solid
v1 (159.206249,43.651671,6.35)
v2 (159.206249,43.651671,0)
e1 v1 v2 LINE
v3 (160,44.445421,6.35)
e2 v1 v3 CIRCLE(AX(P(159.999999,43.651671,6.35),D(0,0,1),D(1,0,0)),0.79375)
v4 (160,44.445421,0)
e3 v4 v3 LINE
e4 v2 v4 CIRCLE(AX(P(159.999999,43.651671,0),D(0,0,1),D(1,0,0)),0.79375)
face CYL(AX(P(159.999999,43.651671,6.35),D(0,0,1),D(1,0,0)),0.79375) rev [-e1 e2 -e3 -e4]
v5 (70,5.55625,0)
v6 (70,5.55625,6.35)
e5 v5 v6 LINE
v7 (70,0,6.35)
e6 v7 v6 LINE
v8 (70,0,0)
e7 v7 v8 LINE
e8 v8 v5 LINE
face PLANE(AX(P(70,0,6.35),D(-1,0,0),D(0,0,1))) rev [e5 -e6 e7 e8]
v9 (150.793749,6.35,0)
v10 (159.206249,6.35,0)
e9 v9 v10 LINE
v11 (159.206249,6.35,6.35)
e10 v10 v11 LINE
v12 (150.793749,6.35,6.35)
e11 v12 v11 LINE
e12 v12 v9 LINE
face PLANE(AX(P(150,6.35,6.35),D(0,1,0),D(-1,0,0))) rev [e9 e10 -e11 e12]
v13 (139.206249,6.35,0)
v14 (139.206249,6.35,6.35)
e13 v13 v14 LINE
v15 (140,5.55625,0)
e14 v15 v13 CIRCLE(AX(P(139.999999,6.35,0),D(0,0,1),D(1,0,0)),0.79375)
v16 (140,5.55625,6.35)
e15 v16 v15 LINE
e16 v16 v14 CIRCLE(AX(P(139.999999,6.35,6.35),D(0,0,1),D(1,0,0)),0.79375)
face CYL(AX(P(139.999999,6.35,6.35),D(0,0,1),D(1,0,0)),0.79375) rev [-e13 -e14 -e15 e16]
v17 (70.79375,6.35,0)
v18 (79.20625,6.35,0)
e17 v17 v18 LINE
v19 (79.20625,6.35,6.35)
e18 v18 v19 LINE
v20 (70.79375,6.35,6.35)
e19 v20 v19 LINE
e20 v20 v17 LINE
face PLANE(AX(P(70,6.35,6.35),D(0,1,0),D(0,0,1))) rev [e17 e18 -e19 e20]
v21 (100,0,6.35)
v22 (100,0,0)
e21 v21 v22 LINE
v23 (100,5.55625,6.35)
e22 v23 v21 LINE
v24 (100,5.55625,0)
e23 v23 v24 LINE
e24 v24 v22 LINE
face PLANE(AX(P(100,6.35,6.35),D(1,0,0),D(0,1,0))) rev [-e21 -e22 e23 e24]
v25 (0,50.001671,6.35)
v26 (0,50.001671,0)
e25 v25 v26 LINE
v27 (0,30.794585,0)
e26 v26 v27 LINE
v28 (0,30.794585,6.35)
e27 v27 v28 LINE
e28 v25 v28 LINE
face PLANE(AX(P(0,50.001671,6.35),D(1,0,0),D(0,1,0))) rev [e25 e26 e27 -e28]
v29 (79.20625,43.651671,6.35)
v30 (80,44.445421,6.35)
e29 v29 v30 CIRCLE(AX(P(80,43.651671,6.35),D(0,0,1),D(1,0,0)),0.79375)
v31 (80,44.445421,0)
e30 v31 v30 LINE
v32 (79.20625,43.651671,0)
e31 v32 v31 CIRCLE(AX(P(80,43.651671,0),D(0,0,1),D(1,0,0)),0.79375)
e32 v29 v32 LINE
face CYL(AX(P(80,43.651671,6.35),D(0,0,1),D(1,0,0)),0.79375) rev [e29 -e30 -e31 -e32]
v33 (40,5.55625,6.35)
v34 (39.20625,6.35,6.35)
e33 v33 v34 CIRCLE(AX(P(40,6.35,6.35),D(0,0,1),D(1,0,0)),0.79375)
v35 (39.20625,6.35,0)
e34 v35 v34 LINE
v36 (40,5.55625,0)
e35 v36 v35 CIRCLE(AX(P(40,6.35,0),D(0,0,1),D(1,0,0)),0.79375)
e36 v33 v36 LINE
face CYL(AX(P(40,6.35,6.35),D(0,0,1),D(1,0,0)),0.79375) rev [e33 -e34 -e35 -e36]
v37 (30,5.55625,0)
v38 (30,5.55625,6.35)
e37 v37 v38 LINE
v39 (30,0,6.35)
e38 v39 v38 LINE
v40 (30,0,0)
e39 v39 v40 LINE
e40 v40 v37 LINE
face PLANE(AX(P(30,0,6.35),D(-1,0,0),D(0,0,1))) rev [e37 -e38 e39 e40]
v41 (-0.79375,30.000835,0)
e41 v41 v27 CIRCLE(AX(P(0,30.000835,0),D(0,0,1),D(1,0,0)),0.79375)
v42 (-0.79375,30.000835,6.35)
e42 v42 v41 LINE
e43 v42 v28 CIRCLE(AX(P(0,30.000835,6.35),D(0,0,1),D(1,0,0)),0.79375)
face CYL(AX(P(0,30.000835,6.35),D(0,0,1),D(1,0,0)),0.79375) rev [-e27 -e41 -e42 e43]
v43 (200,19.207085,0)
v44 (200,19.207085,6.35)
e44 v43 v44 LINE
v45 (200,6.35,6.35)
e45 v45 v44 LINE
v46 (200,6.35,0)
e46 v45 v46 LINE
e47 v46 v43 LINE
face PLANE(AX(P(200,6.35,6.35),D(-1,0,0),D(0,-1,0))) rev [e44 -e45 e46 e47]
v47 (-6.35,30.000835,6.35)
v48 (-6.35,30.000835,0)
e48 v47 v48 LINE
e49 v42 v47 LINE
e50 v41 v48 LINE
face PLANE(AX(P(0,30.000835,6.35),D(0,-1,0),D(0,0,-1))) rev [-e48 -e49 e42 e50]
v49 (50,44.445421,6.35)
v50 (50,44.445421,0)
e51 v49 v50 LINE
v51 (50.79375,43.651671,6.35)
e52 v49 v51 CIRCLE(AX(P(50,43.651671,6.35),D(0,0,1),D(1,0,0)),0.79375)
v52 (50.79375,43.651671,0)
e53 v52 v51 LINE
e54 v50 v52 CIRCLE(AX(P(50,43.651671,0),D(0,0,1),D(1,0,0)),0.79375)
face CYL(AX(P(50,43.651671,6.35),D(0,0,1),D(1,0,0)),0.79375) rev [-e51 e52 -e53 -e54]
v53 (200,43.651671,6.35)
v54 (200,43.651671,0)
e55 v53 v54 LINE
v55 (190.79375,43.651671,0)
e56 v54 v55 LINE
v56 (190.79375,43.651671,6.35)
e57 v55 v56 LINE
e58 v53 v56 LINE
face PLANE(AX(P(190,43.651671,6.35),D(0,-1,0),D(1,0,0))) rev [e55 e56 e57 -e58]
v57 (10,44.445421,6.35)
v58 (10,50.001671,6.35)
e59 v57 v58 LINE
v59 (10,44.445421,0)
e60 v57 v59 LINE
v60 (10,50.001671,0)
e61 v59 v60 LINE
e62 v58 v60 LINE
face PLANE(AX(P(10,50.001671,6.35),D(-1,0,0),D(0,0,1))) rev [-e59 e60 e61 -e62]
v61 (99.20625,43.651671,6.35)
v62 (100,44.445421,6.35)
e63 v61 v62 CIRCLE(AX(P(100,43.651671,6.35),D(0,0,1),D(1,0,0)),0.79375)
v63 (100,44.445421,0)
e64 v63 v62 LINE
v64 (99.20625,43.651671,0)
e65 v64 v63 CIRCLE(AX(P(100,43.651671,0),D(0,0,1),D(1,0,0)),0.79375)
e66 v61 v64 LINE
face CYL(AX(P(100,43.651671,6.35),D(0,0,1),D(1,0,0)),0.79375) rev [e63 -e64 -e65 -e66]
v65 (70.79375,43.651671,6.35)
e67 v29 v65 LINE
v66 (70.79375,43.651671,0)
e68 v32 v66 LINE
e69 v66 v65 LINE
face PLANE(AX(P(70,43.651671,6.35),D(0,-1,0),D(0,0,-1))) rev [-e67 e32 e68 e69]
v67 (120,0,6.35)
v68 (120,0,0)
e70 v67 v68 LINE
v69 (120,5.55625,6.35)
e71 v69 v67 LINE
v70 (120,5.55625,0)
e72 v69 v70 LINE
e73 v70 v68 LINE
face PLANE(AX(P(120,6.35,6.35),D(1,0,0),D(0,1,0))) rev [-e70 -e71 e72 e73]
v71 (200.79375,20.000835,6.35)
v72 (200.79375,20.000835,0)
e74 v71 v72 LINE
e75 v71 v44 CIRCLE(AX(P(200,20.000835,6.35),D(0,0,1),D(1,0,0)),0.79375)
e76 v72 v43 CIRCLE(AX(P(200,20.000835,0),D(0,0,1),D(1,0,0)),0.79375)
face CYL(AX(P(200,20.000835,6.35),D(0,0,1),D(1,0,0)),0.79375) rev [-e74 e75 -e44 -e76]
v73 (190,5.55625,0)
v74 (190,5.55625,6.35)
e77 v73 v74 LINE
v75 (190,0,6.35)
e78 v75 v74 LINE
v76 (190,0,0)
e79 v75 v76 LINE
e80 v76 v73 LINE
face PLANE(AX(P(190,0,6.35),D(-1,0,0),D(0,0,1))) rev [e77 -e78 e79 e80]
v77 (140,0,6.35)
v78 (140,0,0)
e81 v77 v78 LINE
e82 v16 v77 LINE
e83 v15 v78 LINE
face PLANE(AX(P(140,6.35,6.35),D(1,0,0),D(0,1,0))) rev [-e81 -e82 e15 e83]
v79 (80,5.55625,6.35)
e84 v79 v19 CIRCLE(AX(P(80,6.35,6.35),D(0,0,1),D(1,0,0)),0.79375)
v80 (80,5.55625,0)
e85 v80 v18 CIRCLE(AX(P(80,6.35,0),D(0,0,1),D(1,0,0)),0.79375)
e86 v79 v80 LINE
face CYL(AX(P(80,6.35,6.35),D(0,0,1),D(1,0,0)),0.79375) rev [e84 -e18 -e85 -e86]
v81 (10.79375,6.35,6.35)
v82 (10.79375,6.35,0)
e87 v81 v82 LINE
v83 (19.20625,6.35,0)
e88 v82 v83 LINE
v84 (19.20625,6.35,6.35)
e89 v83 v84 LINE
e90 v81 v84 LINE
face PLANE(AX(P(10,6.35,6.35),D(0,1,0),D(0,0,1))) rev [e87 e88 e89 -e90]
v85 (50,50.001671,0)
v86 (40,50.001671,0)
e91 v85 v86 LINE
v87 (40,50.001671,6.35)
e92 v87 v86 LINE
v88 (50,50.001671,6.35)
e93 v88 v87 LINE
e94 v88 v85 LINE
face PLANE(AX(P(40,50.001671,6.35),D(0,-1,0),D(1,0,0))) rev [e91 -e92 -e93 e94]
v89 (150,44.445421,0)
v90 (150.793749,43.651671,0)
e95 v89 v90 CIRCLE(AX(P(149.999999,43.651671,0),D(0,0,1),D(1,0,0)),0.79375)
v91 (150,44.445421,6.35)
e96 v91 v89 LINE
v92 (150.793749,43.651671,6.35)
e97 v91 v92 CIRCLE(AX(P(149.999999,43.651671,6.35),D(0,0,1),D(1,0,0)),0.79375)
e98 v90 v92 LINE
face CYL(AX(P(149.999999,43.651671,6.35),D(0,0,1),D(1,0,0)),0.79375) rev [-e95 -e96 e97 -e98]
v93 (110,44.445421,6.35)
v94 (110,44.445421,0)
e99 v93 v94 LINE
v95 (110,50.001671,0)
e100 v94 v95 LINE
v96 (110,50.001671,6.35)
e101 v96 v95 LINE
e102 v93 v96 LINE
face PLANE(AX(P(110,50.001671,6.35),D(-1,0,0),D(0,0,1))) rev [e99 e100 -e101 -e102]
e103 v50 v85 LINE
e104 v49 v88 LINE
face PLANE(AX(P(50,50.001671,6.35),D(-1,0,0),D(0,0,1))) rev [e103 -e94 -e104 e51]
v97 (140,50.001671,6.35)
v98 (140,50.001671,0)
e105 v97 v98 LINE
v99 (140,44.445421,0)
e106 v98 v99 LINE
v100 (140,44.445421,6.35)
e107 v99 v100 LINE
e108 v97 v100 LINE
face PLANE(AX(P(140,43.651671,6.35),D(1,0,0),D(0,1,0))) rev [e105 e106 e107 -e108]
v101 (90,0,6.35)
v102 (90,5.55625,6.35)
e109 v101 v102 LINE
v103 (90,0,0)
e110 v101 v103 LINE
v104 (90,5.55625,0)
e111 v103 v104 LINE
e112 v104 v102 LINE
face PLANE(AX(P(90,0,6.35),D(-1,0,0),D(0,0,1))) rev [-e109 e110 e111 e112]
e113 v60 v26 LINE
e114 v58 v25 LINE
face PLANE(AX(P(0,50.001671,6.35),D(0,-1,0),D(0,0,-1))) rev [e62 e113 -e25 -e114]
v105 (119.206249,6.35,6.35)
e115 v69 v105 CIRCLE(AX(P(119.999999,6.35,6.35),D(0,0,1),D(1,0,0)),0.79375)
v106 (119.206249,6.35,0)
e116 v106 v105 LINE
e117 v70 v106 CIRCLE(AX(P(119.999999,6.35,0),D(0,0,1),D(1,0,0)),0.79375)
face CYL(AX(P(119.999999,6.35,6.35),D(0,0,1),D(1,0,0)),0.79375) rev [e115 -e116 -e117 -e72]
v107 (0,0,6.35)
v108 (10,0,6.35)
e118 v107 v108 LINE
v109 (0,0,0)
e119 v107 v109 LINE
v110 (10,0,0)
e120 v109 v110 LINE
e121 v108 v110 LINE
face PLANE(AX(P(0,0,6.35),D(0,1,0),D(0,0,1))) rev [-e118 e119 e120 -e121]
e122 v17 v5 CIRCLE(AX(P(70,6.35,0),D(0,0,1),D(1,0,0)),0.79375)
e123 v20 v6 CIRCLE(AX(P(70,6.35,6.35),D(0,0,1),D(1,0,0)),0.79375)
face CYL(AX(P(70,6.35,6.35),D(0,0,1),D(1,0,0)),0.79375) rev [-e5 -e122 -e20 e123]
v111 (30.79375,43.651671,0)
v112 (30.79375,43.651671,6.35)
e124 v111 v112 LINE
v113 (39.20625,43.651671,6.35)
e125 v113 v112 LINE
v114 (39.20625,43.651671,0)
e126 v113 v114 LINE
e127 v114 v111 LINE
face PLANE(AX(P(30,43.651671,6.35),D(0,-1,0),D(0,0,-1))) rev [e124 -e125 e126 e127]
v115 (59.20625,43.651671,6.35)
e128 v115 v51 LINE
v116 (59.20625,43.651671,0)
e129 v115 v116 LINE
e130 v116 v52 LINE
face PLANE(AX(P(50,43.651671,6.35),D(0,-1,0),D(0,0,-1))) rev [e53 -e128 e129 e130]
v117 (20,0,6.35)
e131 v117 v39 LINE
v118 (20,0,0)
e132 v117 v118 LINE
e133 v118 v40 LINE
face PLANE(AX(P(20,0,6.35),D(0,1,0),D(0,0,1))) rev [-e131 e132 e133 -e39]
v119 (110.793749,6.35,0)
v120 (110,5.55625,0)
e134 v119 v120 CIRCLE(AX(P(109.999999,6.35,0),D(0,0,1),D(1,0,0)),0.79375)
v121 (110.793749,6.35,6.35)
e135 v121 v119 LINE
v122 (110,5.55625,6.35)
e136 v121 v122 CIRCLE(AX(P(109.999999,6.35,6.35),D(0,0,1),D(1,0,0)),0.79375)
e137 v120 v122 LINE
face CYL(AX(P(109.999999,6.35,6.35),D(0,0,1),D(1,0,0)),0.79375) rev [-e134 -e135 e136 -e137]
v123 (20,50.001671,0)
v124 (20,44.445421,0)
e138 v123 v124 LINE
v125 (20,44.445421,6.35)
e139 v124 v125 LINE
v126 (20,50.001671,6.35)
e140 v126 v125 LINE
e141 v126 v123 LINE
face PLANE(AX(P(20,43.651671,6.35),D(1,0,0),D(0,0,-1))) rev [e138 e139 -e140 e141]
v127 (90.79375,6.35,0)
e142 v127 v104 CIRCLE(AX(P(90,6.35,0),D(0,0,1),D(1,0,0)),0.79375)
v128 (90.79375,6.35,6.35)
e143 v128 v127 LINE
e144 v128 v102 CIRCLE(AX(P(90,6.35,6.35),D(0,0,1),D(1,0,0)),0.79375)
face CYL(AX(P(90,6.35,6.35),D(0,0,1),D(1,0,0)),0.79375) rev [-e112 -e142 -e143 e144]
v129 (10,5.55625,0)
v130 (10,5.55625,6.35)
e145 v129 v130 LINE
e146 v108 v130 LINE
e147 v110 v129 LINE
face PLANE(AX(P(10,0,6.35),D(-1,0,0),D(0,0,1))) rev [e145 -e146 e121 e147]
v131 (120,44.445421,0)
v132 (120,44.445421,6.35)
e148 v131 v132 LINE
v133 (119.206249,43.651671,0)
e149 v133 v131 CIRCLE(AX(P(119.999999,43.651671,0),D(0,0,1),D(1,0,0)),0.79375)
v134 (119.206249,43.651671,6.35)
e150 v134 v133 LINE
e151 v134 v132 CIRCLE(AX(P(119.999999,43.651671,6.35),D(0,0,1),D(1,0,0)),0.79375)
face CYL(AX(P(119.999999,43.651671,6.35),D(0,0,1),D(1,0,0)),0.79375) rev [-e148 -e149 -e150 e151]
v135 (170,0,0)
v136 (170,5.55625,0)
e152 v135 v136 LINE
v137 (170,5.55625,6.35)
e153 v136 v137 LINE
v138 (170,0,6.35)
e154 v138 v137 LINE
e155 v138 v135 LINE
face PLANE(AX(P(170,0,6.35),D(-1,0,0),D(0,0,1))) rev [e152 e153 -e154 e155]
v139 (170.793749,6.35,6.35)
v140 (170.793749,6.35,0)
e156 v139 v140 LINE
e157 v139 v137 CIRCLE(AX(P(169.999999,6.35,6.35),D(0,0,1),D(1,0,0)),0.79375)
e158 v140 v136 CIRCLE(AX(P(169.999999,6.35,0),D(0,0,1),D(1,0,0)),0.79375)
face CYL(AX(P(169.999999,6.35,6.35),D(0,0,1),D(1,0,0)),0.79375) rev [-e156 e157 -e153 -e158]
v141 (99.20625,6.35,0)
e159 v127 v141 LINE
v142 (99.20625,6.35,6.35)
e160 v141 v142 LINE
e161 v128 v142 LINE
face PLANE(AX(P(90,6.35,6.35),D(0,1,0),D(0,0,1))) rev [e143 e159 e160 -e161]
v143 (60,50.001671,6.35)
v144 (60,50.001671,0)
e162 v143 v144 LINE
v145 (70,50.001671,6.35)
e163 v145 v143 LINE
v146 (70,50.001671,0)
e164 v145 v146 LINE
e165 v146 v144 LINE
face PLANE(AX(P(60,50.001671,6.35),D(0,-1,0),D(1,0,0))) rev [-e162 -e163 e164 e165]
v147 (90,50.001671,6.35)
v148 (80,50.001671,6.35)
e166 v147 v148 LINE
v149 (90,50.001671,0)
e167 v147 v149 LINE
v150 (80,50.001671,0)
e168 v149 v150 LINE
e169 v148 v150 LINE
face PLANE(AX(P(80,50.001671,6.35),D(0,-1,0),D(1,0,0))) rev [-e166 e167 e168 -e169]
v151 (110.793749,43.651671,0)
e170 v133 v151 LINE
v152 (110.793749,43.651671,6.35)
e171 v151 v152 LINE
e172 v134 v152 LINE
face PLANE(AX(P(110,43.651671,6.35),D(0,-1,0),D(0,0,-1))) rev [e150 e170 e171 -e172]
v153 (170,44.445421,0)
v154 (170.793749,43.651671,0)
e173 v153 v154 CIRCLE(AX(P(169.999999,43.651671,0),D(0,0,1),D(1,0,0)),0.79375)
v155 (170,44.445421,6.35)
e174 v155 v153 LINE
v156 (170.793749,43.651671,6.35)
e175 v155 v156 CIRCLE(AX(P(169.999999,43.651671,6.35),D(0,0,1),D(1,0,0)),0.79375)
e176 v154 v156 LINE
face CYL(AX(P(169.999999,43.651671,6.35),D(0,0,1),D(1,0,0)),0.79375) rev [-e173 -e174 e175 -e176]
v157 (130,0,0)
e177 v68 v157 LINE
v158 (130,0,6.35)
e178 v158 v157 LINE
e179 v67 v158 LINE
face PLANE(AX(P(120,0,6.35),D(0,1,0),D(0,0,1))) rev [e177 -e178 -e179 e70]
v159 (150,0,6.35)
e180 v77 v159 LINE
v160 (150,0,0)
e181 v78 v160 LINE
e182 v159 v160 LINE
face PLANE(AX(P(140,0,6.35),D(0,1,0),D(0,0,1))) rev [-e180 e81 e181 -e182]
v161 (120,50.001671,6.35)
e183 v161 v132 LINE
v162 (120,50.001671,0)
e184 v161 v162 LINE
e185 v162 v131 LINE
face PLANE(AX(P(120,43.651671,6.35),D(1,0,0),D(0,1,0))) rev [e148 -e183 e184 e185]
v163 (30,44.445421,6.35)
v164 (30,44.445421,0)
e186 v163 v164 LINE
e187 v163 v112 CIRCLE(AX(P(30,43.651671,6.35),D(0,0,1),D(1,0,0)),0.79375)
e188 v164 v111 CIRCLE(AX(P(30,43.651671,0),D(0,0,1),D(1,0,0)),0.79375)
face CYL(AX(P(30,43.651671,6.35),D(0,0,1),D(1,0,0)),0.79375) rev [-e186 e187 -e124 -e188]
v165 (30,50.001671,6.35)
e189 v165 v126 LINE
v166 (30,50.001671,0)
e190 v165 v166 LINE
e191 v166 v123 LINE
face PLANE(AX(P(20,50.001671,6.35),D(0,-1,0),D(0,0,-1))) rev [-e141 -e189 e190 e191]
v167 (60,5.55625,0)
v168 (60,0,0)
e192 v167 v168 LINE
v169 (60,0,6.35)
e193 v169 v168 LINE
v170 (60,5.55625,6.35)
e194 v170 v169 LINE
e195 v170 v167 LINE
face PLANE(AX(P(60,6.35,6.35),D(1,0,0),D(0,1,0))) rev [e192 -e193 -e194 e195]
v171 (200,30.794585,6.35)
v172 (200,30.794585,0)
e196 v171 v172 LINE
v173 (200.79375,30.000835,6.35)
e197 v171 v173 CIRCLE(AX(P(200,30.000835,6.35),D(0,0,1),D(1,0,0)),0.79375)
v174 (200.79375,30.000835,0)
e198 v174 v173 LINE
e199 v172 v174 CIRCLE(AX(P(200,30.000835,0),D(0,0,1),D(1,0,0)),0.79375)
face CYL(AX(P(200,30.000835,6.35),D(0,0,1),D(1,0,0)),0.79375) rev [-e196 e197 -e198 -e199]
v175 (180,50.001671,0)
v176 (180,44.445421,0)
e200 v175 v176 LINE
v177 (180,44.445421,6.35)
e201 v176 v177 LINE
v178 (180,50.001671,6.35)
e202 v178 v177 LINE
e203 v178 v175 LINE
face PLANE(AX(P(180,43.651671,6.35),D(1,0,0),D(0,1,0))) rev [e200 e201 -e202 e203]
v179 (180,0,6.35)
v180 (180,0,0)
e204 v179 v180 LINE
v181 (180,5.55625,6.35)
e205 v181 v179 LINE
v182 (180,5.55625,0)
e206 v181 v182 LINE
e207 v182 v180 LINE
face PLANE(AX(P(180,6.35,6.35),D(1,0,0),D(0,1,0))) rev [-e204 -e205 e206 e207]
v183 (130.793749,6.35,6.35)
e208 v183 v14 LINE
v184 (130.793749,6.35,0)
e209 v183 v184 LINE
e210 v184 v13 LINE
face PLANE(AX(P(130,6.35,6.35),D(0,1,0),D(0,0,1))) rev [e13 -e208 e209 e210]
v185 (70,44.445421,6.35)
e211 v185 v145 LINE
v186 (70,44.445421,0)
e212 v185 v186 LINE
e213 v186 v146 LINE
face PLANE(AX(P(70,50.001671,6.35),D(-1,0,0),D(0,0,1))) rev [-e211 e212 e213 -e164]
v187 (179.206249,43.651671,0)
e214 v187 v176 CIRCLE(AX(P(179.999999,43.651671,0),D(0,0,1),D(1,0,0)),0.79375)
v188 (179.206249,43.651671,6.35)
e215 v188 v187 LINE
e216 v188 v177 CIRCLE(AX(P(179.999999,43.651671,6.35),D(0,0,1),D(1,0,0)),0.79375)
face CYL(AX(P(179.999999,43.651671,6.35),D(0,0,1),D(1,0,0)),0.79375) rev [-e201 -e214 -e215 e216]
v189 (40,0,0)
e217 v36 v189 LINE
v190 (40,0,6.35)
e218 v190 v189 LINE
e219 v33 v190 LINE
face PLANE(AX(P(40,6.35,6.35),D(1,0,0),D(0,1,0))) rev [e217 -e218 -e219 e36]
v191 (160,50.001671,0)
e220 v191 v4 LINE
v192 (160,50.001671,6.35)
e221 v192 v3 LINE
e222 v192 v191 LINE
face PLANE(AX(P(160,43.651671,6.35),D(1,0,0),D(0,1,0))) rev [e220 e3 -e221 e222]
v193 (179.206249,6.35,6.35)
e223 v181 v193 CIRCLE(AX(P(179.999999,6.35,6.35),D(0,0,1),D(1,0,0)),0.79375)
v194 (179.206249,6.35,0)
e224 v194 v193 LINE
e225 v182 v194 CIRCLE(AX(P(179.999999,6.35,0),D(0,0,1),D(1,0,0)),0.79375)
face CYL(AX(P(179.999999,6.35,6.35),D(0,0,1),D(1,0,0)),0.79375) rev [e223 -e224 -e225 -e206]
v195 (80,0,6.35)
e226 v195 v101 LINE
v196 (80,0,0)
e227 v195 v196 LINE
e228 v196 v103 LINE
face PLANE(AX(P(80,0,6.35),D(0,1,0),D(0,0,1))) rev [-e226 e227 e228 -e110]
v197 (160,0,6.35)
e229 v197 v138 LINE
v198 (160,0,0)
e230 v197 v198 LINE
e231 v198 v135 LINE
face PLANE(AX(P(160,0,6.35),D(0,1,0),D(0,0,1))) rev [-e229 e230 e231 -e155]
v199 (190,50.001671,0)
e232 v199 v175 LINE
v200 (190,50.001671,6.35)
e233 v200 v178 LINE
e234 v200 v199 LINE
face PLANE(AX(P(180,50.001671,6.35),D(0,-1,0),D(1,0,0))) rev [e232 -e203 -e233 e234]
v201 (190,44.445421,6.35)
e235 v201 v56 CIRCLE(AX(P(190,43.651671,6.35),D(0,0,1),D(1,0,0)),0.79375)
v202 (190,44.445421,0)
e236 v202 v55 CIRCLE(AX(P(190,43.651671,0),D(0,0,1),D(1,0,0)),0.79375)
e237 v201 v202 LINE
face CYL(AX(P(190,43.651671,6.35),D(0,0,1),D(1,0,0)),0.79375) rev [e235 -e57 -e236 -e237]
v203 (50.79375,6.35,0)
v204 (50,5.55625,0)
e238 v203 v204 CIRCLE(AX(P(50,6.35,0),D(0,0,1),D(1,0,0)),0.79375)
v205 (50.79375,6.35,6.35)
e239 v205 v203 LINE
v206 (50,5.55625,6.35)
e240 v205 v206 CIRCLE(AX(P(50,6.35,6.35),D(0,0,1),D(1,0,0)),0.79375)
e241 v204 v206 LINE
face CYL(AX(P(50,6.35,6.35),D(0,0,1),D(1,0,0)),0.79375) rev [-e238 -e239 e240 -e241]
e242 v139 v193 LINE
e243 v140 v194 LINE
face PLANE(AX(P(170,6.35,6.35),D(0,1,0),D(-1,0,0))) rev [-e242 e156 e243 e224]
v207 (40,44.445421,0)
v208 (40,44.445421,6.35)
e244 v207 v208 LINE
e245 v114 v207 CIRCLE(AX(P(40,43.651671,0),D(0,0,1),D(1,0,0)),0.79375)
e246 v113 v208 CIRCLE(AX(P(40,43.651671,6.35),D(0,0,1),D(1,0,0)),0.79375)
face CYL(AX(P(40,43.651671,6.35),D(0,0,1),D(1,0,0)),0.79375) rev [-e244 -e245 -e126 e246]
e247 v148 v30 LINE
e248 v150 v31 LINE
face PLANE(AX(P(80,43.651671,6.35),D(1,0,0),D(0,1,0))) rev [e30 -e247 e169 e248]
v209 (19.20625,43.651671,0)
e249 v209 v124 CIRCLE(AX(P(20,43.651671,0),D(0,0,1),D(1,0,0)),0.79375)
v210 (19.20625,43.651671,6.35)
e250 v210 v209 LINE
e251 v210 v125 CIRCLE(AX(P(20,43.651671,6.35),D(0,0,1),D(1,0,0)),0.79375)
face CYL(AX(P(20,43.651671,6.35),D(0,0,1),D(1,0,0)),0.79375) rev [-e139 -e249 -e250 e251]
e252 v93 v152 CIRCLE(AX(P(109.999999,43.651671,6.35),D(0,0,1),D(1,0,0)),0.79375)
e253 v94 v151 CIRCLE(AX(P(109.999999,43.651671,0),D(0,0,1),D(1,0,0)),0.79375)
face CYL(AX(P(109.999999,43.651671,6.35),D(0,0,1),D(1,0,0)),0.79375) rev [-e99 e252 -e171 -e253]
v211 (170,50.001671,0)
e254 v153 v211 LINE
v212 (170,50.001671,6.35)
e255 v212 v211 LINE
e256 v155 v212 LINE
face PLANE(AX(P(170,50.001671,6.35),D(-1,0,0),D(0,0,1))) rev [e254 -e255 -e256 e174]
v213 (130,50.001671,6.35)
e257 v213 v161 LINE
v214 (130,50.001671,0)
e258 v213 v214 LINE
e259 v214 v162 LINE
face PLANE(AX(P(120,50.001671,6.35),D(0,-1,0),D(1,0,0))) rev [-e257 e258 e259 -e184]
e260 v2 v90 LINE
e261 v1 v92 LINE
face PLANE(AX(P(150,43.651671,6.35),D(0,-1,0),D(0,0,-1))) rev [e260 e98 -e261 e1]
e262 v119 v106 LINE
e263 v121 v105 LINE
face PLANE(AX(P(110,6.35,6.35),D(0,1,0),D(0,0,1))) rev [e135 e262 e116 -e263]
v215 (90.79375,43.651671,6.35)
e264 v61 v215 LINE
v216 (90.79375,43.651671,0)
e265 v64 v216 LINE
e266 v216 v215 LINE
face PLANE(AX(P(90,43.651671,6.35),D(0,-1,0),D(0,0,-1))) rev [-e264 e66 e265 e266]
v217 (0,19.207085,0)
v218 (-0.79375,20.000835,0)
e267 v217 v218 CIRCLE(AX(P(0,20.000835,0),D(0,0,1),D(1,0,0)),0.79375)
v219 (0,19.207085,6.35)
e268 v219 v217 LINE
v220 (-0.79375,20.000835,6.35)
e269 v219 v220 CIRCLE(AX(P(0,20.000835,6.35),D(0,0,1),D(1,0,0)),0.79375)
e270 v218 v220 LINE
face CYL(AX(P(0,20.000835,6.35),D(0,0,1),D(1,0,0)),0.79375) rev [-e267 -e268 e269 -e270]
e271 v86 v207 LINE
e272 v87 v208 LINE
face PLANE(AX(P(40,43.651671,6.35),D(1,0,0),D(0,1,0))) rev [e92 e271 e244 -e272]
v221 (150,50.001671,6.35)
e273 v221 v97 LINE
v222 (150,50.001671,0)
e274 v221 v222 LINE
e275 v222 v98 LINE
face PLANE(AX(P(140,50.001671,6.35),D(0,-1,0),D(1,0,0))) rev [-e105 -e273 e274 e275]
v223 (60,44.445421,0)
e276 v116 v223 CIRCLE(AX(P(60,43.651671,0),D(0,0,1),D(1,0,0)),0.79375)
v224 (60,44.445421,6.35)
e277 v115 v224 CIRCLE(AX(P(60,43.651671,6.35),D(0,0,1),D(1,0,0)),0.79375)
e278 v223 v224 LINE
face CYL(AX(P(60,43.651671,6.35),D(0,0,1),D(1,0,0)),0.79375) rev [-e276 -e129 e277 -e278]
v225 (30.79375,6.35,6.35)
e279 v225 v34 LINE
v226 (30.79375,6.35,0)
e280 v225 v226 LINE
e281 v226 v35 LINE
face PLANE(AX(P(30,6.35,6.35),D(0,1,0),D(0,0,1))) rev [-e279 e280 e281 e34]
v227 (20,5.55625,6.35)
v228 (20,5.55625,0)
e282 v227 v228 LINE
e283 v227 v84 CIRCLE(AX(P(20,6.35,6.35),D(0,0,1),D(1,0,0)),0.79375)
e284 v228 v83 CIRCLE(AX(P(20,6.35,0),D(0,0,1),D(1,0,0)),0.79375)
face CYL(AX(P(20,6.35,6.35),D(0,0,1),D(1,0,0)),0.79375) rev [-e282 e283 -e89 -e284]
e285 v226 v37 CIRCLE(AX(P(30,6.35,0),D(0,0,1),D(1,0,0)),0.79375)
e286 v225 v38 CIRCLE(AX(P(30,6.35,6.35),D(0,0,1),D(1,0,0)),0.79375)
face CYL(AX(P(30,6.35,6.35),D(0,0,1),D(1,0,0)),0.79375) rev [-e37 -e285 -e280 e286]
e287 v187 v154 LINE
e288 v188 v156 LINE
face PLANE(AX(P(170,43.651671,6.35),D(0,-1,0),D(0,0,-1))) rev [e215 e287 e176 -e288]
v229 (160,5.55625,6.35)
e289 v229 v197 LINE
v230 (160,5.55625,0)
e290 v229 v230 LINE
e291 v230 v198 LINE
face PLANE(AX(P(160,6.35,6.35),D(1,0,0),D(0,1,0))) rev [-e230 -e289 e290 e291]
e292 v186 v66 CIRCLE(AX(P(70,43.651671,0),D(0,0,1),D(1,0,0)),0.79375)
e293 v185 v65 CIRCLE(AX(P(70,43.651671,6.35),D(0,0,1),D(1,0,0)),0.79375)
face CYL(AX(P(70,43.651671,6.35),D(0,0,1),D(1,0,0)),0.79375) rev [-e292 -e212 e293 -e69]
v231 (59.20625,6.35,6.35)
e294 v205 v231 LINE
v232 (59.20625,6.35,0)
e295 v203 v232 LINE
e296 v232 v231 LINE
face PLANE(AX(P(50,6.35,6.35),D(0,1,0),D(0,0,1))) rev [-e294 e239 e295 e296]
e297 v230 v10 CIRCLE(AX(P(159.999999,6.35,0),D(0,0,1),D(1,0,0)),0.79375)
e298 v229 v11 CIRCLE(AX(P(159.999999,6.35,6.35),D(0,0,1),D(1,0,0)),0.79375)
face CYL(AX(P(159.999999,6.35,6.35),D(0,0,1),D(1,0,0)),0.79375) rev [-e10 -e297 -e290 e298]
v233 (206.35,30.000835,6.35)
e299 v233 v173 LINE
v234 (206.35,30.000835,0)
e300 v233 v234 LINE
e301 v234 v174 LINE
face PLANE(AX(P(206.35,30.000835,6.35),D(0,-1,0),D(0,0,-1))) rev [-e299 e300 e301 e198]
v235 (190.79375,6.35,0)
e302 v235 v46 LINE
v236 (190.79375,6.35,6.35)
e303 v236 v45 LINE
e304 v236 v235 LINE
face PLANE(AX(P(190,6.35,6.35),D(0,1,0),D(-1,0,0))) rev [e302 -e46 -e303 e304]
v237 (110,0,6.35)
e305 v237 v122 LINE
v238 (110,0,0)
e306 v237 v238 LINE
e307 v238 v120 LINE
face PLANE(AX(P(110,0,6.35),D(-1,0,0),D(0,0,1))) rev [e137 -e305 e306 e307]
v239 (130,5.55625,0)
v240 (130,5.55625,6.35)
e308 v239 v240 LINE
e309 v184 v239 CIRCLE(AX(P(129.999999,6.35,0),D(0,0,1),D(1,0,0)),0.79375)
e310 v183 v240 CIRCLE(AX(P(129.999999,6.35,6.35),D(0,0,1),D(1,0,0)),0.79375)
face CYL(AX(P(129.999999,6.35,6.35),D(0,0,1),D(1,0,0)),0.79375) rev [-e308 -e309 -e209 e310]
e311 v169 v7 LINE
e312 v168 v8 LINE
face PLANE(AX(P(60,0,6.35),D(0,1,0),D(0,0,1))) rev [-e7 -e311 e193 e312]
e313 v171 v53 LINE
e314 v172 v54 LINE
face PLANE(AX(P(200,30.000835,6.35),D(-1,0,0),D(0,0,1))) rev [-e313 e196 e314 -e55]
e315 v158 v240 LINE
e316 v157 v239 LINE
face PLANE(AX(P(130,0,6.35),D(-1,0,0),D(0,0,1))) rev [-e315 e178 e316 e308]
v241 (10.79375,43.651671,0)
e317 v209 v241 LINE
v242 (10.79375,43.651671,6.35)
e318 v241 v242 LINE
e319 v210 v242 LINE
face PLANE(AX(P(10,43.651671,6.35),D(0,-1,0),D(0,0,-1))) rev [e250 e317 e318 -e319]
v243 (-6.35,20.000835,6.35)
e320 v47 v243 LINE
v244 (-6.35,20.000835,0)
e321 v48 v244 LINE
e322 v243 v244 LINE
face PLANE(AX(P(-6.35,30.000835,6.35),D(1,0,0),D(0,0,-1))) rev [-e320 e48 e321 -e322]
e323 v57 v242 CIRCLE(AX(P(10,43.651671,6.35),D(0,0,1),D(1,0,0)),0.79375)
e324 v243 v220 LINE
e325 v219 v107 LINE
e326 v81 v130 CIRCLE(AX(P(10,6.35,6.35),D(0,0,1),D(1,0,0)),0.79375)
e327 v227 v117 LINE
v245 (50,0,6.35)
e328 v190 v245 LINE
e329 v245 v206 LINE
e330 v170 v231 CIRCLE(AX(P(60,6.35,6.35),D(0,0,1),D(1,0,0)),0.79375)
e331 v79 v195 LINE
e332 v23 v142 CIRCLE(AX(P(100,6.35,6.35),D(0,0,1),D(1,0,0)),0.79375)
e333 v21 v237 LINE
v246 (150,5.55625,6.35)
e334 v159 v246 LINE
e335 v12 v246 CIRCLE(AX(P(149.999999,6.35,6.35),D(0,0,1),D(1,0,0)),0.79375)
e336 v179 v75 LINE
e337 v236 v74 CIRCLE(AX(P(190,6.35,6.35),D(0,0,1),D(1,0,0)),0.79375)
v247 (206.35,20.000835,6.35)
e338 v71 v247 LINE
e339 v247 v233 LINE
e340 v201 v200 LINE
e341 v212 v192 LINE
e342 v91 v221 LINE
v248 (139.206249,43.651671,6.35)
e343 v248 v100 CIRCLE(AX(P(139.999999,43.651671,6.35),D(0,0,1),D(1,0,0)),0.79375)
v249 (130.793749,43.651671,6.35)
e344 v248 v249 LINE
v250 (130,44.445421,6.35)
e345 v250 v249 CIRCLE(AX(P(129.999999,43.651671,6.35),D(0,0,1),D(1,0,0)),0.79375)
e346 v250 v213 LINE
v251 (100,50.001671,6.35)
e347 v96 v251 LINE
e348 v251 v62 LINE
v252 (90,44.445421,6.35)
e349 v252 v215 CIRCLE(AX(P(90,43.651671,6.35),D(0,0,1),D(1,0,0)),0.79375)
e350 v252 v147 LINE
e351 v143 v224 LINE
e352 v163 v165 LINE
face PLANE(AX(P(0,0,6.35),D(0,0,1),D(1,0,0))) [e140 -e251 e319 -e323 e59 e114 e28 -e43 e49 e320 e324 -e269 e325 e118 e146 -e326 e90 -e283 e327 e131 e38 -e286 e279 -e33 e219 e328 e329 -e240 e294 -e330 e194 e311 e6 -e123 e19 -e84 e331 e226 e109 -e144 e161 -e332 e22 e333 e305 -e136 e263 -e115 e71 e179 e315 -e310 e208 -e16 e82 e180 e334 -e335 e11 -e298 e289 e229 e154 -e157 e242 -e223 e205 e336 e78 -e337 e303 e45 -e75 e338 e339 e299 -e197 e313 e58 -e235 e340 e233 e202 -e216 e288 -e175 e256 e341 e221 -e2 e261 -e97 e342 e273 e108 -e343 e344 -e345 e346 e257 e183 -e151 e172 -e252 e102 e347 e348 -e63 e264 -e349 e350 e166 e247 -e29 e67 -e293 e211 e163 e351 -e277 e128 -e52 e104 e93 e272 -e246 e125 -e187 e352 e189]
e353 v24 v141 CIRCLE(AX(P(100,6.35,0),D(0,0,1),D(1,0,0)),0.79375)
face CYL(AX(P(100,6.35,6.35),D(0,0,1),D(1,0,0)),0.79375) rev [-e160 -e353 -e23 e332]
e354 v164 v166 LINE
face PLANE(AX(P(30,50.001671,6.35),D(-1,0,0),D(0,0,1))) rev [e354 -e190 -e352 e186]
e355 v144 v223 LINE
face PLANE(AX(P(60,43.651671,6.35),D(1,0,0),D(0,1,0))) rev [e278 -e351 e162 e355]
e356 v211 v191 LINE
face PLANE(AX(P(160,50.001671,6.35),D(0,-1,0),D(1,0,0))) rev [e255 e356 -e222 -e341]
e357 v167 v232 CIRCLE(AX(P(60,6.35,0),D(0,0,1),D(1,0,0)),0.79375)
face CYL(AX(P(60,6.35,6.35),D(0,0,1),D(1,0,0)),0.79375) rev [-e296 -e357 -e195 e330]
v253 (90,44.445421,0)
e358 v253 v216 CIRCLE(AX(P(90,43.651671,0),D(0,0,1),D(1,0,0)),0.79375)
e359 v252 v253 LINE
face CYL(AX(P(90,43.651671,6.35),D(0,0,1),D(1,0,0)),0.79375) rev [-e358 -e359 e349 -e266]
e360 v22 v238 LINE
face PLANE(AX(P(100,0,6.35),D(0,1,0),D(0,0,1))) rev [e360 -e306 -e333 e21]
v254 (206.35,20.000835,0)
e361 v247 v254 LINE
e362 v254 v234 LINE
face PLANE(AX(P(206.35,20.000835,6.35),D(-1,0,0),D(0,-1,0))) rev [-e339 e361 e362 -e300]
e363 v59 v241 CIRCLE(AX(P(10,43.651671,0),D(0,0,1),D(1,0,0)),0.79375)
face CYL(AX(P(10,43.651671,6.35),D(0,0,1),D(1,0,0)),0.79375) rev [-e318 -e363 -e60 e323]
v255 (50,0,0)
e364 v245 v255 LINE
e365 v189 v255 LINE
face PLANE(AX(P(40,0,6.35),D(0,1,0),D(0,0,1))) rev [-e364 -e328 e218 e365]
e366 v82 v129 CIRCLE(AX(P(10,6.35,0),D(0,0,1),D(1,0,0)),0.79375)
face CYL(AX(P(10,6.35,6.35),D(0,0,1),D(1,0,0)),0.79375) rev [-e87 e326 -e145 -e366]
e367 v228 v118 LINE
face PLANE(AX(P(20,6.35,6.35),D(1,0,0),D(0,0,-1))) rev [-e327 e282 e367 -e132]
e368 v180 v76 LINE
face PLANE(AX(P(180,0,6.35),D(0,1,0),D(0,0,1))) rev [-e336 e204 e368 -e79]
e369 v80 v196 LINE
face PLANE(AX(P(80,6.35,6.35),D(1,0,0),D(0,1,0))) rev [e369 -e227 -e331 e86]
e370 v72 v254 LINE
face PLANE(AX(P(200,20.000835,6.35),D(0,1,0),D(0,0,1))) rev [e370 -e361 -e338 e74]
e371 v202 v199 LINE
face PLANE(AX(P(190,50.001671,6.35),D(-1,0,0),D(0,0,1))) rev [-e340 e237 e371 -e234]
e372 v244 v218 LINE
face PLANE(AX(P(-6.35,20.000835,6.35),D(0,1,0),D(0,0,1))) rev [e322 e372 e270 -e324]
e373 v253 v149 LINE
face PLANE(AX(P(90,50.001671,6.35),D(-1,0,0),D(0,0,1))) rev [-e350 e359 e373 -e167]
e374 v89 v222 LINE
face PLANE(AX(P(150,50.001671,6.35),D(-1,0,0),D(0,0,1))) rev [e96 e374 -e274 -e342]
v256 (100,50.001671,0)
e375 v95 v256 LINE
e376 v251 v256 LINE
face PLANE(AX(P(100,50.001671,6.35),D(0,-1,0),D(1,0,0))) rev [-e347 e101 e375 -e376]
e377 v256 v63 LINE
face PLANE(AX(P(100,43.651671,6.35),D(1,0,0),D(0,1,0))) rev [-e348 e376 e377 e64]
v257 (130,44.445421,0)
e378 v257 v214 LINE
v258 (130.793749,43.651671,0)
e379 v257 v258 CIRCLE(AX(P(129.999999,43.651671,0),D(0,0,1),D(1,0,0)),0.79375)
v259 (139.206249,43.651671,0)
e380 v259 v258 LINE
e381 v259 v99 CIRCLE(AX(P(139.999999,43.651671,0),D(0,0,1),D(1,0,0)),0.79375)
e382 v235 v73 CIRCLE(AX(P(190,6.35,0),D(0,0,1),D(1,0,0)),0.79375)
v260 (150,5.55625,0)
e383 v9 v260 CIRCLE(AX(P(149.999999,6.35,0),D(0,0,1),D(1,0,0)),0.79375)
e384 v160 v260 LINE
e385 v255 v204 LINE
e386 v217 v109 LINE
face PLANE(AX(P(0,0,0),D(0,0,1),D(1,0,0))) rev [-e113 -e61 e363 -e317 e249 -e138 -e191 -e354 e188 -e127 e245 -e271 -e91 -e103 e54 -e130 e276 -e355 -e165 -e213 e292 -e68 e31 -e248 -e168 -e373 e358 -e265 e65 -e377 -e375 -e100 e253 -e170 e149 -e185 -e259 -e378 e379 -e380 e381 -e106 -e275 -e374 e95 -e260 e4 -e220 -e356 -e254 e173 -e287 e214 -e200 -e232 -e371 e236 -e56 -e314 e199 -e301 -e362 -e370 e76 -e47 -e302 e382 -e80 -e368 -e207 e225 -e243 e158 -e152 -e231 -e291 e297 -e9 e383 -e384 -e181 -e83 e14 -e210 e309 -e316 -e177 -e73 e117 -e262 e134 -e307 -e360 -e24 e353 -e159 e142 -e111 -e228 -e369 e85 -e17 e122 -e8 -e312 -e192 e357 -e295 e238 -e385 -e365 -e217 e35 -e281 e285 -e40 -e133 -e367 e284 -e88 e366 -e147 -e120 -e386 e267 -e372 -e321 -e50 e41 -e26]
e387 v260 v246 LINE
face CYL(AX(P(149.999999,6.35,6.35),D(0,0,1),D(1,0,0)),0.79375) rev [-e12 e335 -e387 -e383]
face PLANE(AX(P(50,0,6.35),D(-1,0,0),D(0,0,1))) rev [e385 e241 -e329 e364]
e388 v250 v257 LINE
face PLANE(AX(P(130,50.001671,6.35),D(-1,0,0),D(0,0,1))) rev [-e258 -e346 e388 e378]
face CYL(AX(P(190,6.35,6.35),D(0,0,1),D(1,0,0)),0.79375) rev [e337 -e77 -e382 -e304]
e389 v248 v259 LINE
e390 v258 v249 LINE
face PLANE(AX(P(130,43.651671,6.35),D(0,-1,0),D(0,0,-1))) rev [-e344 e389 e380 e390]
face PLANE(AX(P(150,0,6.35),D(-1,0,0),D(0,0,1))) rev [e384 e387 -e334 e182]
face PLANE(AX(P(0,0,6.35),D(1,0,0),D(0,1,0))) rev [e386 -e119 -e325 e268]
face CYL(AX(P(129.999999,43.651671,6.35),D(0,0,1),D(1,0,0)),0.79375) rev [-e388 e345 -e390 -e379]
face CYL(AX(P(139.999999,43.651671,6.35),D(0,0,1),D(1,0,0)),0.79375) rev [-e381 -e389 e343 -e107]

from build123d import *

# Parameters (mm, degrees)
BOSS_EXTRUDE1_START            = 6.35
BOSS_EXTRUDE1_OUTLINE_W        = 200
BOSS_EXTRUDE1_OUTLINE_H        = 6.35
BOSS_EXTRUDE1_DEPTH            = 37.301670771
BOSS_EXTRUDE1_2_OUTLINE_W      = 10
BOSS_EXTRUDE1_2_OUTLINE_H      = 6.35
BOSS_EXTRUDE1_2_DEPTH          = 50.001670771
BOSS_EXTRUDE1_START_2          = 20.000835386
BOSS_EXTRUDE1_3_OUTLINE_W      = 6.35
BOSS_EXTRUDE1_3_OUTLINE_H      = 6.35
BOSS_EXTRUDE1_3_DEPTH          = 10
F_1_16_0_0625_DIAMETER_HOLE1_D = 1.5875


# Read off the part's stored shape, not the designer's step: Boss-Extrude1
with BuildPart() as part:
    # Boss-Extrude1 outline → Boss-Extrude1 (new body)
    with BuildSketch(Plane(origin=(0, 0, 0), x_dir=(1, 0, 0), z_dir=(0, 1, 0)).offset(BOSS_EXTRUDE1_START)):
        with Locations((100, -3.175)):
            Rectangle(BOSS_EXTRUDE1_OUTLINE_W, BOSS_EXTRUDE1_OUTLINE_H)
    extrude(amount=BOSS_EXTRUDE1_DEPTH)

    # Boss-Extrude1 2 outline → Boss-Extrude1 2 (add)
    with BuildSketch(Plane(origin=(0, 0, 0), x_dir=(1, 0, 0), z_dir=(0, 1, 0))):
        with Locations((25, -3.175)):
            Rectangle(BOSS_EXTRUDE1_2_OUTLINE_W, BOSS_EXTRUDE1_2_OUTLINE_H)
        with Locations((45, -3.175)):
            Rectangle(BOSS_EXTRUDE1_2_OUTLINE_W, BOSS_EXTRUDE1_2_OUTLINE_H)
        with Locations((5, -3.175)):
            Rectangle(BOSS_EXTRUDE1_2_OUTLINE_W, BOSS_EXTRUDE1_2_OUTLINE_H)
        with Locations((65, -3.175)):
            Rectangle(BOSS_EXTRUDE1_2_OUTLINE_W, BOSS_EXTRUDE1_2_OUTLINE_H)
        with Locations((85, -3.175)):
            Rectangle(BOSS_EXTRUDE1_2_OUTLINE_W, BOSS_EXTRUDE1_2_OUTLINE_H)
        with Locations((105, -3.175)):
            Rectangle(BOSS_EXTRUDE1_2_OUTLINE_W, BOSS_EXTRUDE1_2_OUTLINE_H)
        with Locations((125, -3.175)):
            Rectangle(BOSS_EXTRUDE1_2_OUTLINE_W, BOSS_EXTRUDE1_2_OUTLINE_H)
        with Locations((145, -3.175)):
            Rectangle(BOSS_EXTRUDE1_2_OUTLINE_W, BOSS_EXTRUDE1_2_OUTLINE_H)
        with Locations((165, -3.175)):
            Rectangle(BOSS_EXTRUDE1_2_OUTLINE_W, BOSS_EXTRUDE1_2_OUTLINE_H)
        with Locations((185, -3.175)):
            Rectangle(BOSS_EXTRUDE1_2_OUTLINE_W, BOSS_EXTRUDE1_2_OUTLINE_H)
    extrude(amount=BOSS_EXTRUDE1_2_DEPTH)

    # Boss-Extrude1 3 outline → Boss-Extrude1 3 (add)
    with BuildSketch(Plane(origin=(0, 0, 0), x_dir=(1, 0, 0), z_dir=(0, 1, 0)).offset(BOSS_EXTRUDE1_START_2)):
        with Locations((-3.175, -3.175)):
            Rectangle(BOSS_EXTRUDE1_3_OUTLINE_W, BOSS_EXTRUDE1_3_OUTLINE_H)
        with Locations((203.175, -3.175)):
            Rectangle(BOSS_EXTRUDE1_3_OUTLINE_W, BOSS_EXTRUDE1_3_OUTLINE_H)
    extrude(amount=BOSS_EXTRUDE1_3_DEPTH)

    # 1/16 (0.0625) Diameter Hole1 (through all)
    with Locations(Plane.XY.offset(6.35)):
        with Locations((10, 43.651670771), (20, 43.651670771), (20, 6.35), (10, 6.35), (29.999999878, 43.651670771), (39.999999878, 43.651670771), (39.999999878, 6.35), (29.999999878, 6.35), (49.999999756, 43.651670771), (59.999999756, 43.651670771), (59.999999756, 6.35), (49.999999756, 6.35), (69.999999634, 43.651670771), (79.999999634, 43.651670771), (79.999999634, 6.35), (69.999999634, 6.35), (89.999999512, 43.651670771), (99.999999512, 43.651670771), (99.999999512, 6.35), (89.999999512, 6.35), (109.99999939, 43.651670771), (119.99999939, 43.651670771), (119.99999939, 6.35), (109.99999939, 6.35), (129.999999268, 43.651670771), (139.999999268, 43.651670771), (139.999999268, 6.35), (129.999999268, 6.35), (149.999999146, 43.651670771), (159.999999146, 43.651670771), (159.999999146, 6.35), (149.999999146, 6.35), (169.999999024, 43.651670771), (179.999999024, 43.651670771), (179.999999024, 6.35), (169.999999024, 6.35), (190, 43.651670771), (190, 6.35), (200, 20.000835386), (200, 30.000835386), (0, 30.000835386), (0, 20.000835386)):
            Hole(F_1_16_0_0625_DIAMETER_HOLE1_D / 2)


solid = part.part
